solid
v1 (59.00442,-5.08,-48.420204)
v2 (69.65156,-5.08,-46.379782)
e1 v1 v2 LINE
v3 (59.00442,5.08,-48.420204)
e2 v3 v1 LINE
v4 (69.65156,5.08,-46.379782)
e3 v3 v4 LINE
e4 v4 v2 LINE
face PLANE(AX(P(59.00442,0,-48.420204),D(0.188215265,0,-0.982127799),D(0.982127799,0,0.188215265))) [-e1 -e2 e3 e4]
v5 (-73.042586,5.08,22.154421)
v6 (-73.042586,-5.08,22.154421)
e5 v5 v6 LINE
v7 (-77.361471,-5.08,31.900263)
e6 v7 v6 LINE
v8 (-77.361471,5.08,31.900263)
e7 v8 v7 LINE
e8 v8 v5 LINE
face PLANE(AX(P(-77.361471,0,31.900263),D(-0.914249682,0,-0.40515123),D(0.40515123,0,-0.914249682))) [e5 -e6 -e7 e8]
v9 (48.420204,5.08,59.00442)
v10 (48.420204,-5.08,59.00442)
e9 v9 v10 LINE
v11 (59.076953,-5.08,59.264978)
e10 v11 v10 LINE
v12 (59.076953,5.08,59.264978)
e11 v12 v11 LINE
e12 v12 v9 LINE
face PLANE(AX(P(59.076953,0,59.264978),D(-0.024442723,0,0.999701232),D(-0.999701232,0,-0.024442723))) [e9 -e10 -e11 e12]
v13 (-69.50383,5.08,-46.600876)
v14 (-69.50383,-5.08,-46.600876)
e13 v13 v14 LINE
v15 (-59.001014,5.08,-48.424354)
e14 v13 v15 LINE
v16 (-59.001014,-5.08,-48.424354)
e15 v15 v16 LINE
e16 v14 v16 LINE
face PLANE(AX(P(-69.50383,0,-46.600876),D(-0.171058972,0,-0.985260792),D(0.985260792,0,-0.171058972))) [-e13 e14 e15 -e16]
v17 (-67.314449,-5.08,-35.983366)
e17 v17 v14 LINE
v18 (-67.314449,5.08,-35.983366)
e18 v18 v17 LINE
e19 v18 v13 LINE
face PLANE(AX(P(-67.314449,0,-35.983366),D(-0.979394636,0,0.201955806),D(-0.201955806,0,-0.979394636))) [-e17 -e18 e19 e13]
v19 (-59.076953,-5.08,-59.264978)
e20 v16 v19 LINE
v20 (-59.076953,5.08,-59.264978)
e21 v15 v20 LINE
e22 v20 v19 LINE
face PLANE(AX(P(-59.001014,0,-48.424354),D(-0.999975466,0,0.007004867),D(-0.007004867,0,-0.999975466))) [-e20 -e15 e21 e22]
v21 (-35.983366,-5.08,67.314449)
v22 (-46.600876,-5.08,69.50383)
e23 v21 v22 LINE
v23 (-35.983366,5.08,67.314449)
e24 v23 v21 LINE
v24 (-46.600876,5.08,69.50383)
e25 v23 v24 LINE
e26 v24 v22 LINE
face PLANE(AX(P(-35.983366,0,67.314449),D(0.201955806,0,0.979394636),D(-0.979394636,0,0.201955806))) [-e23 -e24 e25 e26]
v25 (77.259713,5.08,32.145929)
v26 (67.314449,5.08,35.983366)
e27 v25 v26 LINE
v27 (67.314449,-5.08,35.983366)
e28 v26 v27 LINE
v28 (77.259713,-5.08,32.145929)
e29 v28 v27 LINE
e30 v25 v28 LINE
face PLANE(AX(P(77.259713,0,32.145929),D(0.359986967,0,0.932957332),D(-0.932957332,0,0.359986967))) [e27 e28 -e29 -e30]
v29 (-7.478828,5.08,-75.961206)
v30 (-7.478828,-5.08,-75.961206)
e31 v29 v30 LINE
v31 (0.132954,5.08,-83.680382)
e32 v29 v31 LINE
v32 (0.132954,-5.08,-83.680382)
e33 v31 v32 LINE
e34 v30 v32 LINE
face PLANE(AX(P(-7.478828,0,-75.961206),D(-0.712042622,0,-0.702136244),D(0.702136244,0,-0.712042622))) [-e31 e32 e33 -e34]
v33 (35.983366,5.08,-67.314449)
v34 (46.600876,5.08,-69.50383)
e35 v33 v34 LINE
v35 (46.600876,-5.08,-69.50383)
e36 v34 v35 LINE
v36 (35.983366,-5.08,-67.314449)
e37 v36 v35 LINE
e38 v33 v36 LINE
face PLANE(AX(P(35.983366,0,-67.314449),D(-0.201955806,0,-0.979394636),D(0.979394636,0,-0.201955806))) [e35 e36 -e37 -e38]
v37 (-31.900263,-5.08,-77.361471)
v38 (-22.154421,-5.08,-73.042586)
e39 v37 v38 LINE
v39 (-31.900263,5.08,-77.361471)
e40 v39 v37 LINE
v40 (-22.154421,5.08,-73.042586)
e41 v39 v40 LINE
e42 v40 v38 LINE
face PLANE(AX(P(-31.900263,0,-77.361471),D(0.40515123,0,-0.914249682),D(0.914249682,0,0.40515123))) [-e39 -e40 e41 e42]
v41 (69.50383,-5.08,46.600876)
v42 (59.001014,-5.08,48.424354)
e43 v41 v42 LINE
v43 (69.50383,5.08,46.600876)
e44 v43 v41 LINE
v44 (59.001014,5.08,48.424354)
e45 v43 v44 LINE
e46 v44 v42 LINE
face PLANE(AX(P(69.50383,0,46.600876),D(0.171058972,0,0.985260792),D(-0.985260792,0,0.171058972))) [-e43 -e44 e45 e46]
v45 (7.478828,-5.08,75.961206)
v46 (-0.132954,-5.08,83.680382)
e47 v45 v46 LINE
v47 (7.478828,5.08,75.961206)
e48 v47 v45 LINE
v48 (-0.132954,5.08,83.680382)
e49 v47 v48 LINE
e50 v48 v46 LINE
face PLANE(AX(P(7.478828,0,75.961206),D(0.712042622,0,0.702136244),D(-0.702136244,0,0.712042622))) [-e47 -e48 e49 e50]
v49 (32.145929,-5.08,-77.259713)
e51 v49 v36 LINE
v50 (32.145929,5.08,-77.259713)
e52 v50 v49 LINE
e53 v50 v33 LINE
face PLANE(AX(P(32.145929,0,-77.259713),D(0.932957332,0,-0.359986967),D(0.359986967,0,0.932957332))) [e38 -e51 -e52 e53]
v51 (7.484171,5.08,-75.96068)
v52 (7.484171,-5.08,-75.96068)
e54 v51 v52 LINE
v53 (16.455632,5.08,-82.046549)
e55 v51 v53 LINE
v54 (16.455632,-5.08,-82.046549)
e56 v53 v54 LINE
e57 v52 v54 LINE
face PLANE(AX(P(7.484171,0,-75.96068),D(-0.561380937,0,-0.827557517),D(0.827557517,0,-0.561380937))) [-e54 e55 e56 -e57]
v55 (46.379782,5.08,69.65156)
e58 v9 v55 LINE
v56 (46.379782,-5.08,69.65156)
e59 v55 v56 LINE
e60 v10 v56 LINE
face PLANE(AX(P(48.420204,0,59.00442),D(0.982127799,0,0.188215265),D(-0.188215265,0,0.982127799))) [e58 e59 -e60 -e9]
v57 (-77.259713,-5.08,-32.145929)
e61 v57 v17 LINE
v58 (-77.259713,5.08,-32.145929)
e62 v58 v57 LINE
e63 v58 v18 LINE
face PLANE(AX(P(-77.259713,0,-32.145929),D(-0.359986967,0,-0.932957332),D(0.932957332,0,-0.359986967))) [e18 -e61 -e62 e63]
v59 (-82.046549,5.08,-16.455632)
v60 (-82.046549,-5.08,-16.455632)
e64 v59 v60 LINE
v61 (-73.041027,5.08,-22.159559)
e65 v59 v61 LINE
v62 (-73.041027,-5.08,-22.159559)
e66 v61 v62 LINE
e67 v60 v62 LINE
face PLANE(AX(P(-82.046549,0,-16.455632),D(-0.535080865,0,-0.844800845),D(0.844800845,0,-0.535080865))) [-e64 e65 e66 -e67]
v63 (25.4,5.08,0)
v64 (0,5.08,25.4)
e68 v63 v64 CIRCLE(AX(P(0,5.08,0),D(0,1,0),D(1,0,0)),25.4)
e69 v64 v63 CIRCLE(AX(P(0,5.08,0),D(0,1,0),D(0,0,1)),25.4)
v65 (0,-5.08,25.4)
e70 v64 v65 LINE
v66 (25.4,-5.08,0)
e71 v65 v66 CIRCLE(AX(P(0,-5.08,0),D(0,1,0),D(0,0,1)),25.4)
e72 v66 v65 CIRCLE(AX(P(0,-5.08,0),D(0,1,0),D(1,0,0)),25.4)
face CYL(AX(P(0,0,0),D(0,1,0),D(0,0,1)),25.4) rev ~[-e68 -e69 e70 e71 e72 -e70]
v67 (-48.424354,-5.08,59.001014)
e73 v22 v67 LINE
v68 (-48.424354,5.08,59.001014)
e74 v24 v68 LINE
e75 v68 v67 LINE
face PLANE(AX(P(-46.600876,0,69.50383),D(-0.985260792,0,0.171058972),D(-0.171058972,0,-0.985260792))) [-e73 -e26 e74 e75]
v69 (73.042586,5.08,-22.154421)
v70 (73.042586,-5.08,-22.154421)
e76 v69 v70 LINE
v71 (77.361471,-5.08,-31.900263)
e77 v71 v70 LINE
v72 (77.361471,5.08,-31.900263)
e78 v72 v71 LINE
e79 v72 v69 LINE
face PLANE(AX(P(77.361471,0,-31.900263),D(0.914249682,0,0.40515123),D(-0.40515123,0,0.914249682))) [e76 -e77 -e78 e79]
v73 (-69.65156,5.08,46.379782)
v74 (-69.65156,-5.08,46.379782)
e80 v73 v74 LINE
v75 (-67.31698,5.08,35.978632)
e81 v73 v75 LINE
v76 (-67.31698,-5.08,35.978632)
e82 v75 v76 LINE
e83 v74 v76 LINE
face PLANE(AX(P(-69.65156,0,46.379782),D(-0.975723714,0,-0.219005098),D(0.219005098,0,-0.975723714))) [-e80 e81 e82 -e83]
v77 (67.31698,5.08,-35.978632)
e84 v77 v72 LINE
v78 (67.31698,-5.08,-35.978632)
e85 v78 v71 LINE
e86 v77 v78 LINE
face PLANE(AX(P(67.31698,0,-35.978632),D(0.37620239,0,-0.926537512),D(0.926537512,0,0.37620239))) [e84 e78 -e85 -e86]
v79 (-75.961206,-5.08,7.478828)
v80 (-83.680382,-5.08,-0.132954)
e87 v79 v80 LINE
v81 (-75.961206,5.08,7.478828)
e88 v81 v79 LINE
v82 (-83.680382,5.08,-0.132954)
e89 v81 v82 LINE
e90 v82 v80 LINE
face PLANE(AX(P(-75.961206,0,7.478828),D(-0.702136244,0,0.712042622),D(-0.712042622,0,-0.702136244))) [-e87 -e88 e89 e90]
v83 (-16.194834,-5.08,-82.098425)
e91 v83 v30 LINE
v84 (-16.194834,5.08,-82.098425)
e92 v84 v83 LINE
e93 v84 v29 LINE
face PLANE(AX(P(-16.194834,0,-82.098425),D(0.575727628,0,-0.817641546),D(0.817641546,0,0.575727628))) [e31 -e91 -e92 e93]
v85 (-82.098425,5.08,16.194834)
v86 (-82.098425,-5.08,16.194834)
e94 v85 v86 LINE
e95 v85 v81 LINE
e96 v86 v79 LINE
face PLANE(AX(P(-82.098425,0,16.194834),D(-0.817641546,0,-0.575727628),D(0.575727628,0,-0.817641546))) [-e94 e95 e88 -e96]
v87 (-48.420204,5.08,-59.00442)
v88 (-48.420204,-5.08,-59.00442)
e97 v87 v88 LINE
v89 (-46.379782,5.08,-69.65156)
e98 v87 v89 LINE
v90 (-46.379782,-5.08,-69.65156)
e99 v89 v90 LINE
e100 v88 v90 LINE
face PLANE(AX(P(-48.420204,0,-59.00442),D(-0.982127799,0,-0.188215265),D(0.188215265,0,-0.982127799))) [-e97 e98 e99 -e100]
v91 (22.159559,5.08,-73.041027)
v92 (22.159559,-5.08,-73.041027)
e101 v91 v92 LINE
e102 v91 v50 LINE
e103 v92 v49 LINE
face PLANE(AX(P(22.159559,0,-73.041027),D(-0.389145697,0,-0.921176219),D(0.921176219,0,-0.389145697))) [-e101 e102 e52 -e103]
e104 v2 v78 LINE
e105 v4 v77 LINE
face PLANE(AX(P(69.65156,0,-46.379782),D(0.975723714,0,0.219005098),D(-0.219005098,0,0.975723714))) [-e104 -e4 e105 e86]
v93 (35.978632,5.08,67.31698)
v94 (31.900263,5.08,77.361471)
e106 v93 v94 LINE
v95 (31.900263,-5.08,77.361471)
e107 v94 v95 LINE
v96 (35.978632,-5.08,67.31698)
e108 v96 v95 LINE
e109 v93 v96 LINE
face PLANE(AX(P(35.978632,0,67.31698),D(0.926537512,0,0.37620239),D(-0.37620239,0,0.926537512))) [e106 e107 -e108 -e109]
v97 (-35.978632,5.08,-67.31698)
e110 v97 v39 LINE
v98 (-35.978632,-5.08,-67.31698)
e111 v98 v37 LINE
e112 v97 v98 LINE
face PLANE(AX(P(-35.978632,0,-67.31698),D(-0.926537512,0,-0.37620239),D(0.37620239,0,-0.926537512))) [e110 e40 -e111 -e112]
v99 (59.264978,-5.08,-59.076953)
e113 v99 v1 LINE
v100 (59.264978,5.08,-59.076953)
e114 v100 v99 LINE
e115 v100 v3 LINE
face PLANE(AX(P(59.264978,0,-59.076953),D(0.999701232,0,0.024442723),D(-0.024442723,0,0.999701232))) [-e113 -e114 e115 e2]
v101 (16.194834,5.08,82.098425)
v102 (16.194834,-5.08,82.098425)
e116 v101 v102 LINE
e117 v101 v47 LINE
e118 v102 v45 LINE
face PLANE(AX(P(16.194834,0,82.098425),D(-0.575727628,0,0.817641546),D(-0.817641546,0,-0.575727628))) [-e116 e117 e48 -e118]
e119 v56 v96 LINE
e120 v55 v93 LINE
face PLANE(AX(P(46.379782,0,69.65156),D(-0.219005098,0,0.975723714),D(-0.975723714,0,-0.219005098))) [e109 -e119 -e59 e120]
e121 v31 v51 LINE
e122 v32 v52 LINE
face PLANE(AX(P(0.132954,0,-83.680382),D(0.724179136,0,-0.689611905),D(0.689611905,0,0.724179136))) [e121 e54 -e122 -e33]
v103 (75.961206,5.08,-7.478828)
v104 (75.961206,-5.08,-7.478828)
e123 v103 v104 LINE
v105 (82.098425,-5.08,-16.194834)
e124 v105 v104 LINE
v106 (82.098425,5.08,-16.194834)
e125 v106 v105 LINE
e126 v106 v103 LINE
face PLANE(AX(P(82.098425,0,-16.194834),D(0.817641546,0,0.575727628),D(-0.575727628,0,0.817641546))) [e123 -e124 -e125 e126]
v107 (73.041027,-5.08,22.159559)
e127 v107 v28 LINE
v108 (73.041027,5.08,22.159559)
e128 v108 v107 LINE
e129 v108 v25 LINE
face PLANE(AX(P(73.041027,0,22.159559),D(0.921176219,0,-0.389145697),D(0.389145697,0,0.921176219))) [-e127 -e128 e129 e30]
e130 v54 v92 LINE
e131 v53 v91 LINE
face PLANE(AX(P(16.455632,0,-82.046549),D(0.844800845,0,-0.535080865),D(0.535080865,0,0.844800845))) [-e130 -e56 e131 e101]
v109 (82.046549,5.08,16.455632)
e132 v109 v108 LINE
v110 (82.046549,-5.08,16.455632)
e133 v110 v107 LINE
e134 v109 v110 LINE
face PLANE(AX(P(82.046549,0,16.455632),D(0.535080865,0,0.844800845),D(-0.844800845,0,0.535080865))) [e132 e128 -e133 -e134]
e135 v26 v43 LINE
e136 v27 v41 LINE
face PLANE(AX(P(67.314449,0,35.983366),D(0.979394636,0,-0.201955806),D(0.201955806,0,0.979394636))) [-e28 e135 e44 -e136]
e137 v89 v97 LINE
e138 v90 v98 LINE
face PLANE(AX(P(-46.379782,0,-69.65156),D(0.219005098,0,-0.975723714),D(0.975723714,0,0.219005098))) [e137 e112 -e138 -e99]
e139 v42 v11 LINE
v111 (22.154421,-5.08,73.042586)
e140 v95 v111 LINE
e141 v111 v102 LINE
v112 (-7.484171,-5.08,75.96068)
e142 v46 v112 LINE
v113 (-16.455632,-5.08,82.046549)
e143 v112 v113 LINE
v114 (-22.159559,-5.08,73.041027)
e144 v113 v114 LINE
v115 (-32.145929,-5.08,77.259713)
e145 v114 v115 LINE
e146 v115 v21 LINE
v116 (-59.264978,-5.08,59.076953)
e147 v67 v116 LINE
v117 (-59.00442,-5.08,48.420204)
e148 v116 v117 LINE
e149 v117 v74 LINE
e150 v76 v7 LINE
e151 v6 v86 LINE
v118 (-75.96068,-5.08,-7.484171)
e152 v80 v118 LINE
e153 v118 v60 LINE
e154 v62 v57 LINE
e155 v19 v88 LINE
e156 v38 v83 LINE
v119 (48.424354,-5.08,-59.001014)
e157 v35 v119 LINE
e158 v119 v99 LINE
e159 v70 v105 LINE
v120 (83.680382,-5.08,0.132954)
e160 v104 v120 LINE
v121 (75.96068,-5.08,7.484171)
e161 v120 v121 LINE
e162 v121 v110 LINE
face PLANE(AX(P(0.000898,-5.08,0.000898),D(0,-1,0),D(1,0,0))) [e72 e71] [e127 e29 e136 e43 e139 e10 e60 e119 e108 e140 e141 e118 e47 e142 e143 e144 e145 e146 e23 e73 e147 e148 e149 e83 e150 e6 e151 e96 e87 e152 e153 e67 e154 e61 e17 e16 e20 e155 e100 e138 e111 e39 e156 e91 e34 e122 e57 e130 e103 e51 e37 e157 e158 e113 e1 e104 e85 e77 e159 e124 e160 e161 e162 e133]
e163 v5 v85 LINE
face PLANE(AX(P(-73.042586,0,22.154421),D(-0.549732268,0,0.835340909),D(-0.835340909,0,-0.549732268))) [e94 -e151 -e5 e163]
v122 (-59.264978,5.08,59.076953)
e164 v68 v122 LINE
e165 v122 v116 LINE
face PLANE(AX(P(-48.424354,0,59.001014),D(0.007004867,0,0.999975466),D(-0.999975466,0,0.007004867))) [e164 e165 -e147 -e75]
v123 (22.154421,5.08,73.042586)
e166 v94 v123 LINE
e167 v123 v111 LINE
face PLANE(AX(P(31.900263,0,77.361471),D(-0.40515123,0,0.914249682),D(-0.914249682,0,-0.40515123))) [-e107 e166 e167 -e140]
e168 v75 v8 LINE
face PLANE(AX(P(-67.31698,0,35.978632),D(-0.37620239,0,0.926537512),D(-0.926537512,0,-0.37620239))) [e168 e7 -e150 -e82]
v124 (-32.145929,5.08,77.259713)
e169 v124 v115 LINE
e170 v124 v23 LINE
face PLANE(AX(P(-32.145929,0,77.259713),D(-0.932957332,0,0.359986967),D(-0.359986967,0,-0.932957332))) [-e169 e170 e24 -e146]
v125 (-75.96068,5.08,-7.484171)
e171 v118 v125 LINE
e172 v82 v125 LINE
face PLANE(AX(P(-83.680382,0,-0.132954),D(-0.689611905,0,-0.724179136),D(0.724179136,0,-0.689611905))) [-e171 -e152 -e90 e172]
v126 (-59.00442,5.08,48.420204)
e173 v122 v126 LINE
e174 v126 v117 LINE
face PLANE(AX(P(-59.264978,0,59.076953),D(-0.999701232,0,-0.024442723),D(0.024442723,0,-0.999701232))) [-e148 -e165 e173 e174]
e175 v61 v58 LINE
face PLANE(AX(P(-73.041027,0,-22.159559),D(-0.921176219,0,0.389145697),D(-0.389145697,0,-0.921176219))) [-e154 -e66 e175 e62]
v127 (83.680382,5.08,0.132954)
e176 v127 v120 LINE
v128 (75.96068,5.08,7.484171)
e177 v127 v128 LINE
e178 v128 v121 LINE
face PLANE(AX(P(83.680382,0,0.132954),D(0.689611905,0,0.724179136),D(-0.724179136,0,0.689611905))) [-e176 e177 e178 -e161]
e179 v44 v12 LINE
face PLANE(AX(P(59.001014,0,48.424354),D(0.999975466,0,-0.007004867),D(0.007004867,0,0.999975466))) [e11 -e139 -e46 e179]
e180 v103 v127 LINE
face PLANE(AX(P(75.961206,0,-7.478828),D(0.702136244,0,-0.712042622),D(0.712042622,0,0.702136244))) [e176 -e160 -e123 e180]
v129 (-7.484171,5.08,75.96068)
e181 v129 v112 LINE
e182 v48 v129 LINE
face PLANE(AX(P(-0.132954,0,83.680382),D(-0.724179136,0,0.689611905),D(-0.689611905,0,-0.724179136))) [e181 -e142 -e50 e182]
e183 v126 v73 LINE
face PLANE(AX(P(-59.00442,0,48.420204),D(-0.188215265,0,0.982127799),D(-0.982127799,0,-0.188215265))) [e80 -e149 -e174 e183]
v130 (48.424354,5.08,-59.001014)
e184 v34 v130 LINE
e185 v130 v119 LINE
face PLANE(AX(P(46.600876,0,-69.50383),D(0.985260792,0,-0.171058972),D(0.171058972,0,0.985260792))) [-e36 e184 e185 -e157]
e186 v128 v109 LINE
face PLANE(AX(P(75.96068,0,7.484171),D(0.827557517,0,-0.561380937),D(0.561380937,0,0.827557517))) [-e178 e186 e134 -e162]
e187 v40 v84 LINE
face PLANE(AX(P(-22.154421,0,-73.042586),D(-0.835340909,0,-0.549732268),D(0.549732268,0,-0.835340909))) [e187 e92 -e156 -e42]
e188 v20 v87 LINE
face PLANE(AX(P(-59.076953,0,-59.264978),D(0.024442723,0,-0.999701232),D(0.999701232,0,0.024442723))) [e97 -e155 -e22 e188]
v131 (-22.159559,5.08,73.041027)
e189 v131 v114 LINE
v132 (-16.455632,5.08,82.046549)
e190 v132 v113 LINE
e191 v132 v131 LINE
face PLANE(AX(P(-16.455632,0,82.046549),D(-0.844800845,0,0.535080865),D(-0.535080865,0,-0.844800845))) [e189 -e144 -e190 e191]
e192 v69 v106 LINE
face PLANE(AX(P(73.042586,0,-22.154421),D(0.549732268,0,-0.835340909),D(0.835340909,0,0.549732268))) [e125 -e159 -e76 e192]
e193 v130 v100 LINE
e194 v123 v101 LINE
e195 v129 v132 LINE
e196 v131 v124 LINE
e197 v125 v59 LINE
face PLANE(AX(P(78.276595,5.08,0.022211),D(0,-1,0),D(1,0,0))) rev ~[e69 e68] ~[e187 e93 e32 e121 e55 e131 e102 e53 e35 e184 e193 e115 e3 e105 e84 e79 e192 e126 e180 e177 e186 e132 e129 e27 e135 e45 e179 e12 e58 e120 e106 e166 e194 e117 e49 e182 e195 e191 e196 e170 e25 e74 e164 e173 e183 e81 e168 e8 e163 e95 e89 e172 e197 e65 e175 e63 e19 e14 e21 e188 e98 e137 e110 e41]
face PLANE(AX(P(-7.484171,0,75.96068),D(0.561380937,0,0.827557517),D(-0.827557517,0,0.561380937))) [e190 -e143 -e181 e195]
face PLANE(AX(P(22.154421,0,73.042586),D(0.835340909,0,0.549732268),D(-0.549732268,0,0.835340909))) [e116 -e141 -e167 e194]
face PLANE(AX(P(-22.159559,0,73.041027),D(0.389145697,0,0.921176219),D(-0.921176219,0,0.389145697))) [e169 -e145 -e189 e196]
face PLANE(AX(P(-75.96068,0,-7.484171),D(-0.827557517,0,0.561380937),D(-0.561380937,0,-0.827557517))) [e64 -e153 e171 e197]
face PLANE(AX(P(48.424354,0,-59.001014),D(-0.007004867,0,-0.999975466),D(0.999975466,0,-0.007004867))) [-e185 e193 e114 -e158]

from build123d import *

# Parameters (mm, degrees)
F1_DEPTH = 5.08
F2_DEPTH = 5.08
F3_DEPTH = 5.08


with BuildPart() as f1:
    # F0 (on Front) → F1 (new body, symmetric)
    with BuildSketch(Plane.XZ):
        with BuildLine():
            ThreePointArc((75.8478085303, 7.3177825298), (76.1119012048, 3.6631263964), (76.2, 0))
            ThreePointArc((76.2, 0), (76.1119012048, -3.6631263964), (75.8478085303, -7.3177825298))
            Line((75.8478085303, -7.3177825298), (75.9612060886, -7.4788283967))
            Line((75.9612060886, -7.4788283967), (83.6803820326, 0.1329535853))
            Line((83.6803820326, 0.1329535853), (75.9606798536, 7.4841713504))
            Line((75.9606798536, 7.4841713504), (75.8478085303, 7.3177825298))
        make_face()
        with BuildLine():
            ThreePointArc((75.8180427075, 7.62), (75.8330761724, 7.4689060931), (75.8478085303, 7.3177825298))
            Line((75.8478085303, 7.3177825298), (75.9606798536, 7.4841713504))
            Line((75.9606798536, 7.4841713504), (75.8180427075, 7.62))
        make_face()
        with BuildLine():
            Line((75.9612060886, -7.4788283967), (75.8478085303, -7.3177825298))
            ThreePointArc((75.8478085303, -7.3177825298), (75.8330761724, -7.4689060931), (75.8180427075, -7.62))
            Line((75.8180427075, -7.62), (75.9612060886, -7.4788283967))
        make_face()
        with BuildLine():
            ThreePointArc((72.9627856072, 21.9743467808), (74.7358383667, 14.8658825376), (75.8180427075, 7.62))
            Line((75.8180427075, 7.62), (75.9606798536, 7.4841713504))
            Line((75.9606798536, 7.4841713504), (82.0465489983, 16.4556315966))
            Line((82.0465489983, 16.4556315966), (73.041027291, 22.1595585897))
            Line((73.041027291, 22.1595585897), (72.9627856072, 21.9743467808))
        make_face()
        with BuildLine():
            Line((75.9612060886, -7.4788283967), (75.8180427075, -7.62))
            ThreePointArc((75.8180427075, -7.62), (74.7358383667, -14.8658825376), (72.9627856072, -21.9743467808))
            Line((72.9627856072, -21.9743467808), (73.0425857732, -22.1544209627))
            Line((73.0425857732, -22.1544209627), (82.0984249139, -16.1948337577))
            Line((82.0984249139, -16.1948337577), (75.9612060886, -7.4788283967))
        make_face()
        with BuildLine():
            ThreePointArc((72.8746320228, 22.2649502031), (72.9188535828, 22.1196924068), (72.9627856072, 21.9743467808))
            Line((72.9627856072, 21.9743467808), (73.041027291, 22.1595585897))
            Line((73.041027291, 22.1595585897), (72.8746320228, 22.2649502031))
        make_face()
        with BuildLine():
            Line((73.0425857732, -22.1544209627), (72.9627856072, -21.9743467808))
            ThreePointArc((72.9627856072, -21.9743467808), (72.9188535828, -22.1196924068), (72.8746320228, -22.2649502031))
            Line((72.8746320228, -22.2649502031), (73.0425857732, -22.1544209627))
        make_face()
        with BuildLine():
            ThreePointArc((67.2738437512, 35.7864492084), (70.3996203774, 29.1604775462), (72.8746320228, 22.2649502031))
            Line((72.8746320228, 22.2649502031), (73.041027291, 22.1595585897))
            Line((73.041027291, 22.1595585897), (77.2597130983, 32.1459289141))
            Line((77.2597130983, 32.1459289141), (67.3144490116, 35.9833664196))
            Line((67.3144490116, 35.9833664196), (67.2738437512, 35.7864492084))
        make_face()
        with BuildLine():
            Line((73.0425857732, -22.1544209627), (72.8746320228, -22.2649502031))
            ThreePointArc((72.8746320228, -22.2649502031), (70.3996203774, -29.1604775462), (67.2738437512, -35.7864492084))
            Line((67.2738437512, -35.7864492084), (67.3169798492, -35.9786315554))
            Line((67.3169798492, -35.9786315554), (77.361471367, -31.9002627216))
            Line((77.361471367, -31.9002627216), (73.0425857732, -22.1544209627))
        make_face()
        with BuildLine():
            ThreePointArc((67.1306900979, 36.0542708563), (67.2024003433, 35.9204313461), (67.2738437512, 35.7864492084))
            Line((67.2738437512, 35.7864492084), (67.3144490116, 35.9833664196))
            Line((67.3144490116, 35.9833664196), (67.1306900979, 36.0542708563))
        make_face()
        with BuildLine():
            Line((67.3169798492, -35.9786315554), (67.2738437512, -35.7864492084))
            ThreePointArc((67.2738437512, -35.7864492084), (67.2024003433, -35.9204313461), (67.1306900979, -36.0542708563))
            Line((67.1306900979, -36.0542708563), (67.3169798492, -35.9786315554))
        make_face()
        with BuildLine():
            ThreePointArc((58.9996058074, 48.2232984621), (63.3579844575, 42.3344517561), (67.1306900979, 36.0542708563))
            Line((67.1306900979, 36.0542708563), (67.3144490116, 35.9833664196))
            Line((67.3144490116, 35.9833664196), (69.5038297516, 46.6008762111))
            Line((69.5038297516, 46.6008762111), (59.001014207, 48.4243536577))
            Line((59.001014207, 48.4243536577), (58.9996058074, 48.2232984621))
        make_face()
        with BuildLine():
            Line((67.3169798492, -35.9786315554), (67.1306900979, -36.0542708563))
            ThreePointArc((67.1306900979, -36.0542708563), (63.3579844575, -42.3344517561), (58.9996058074, -48.2232984621))
            Line((58.9996058074, -48.2232984621), (59.0044201415, -48.4202035145))
            Line((59.0044201415, -48.4202035145), (69.6515598604, -46.379782479))
            Line((69.6515598604, -46.379782479), (67.3169798492, -35.9786315554))
        make_face()
        with BuildLine():
            ThreePointArc((58.8069534, 48.4580460999), (58.9033965462, 48.3407682533), (58.9996058074, 48.2232984621))
            Line((58.9996058074, 48.2232984621), (59.001014207, 48.4243536577))
            Line((59.001014207, 48.4243536577), (58.8069534, 48.4580460999))
        make_face()
        with BuildLine():
            Line((59.0044201415, -48.4202035145), (58.9996058074, -48.2232984621))
            ThreePointArc((58.9996058074, -48.2232984621), (58.9033965462, -48.3407682533), (58.8069534, -48.4580460999))
            Line((58.8069534, -48.4580460999), (59.0044201415, -48.4202035145))
        make_face()
        with BuildLine():
            ThreePointArc((48.4580460999, 58.8069534), (53.8815367264, 53.8815367264), (58.8069534, 48.4580460999))
            Line((58.8069534, 48.4580460999), (59.001014207, 48.4243536577))
            Line((59.001014207, 48.4243536577), (59.0769532058, 59.2649779693))
            Line((59.0769532058, 59.2649779693), (48.4202035145, 59.0044201415))
            Line((48.4202035145, 59.0044201415), (48.4580460999, 58.8069534))
        make_face()
        with BuildLine():
            Line((59.0044201415, -48.4202035145), (58.8069534, -48.4580460999))
            ThreePointArc((58.8069534, -48.4580460999), (53.8815367264, -53.8815367264), (48.4580460999, -58.8069534))
            Line((48.4580460999, -58.8069534), (48.4243536577, -59.001014207))
            Line((48.4243536577, -59.001014207), (59.2649779693, -59.0769532058))
            Line((59.2649779693, -59.0769532058), (59.0044201415, -48.4202035145))
        make_face()
        with BuildLine():
            ThreePointArc((48.2232984621, 58.9996058074), (48.3407682533, 58.9033965462), (48.4580460999, 58.8069534))
            Line((48.4580460999, 58.8069534), (48.4202035145, 59.0044201415))
            Line((48.4202035145, 59.0044201415), (48.2232984621, 58.9996058074))
        make_face()
        with BuildLine():
            Line((48.4243536577, -59.001014207), (48.4580460999, -58.8069534))
            ThreePointArc((48.4580460999, -58.8069534), (48.3407682533, -58.9033965462), (48.2232984621, -58.9996058074))
            Line((48.2232984621, -58.9996058074), (48.4243536577, -59.001014207))
        make_face()
        with BuildLine():
            ThreePointArc((36.0542708563, 67.1306900979), (42.3344517561, 63.3579844575), (48.2232984621, 58.9996058074))
            Line((48.2232984621, 58.9996058074), (48.4202035145, 59.0044201415))
            Line((48.4202035145, 59.0044201415), (46.379782479, 69.6515598604))
            Line((46.379782479, 69.6515598604), (35.9786315554, 67.3169798492))
            Line((35.9786315554, 67.3169798492), (36.0542708563, 67.1306900979))
        make_face()
        with BuildLine():
            Line((48.4243536577, -59.001014207), (48.2232984621, -58.9996058074))
            ThreePointArc((48.2232984621, -58.9996058074), (42.3344517561, -63.3579844575), (36.0542708563, -67.1306900979))
            Line((36.0542708563, -67.1306900979), (35.9833664196, -67.3144490116))
            Line((35.9833664196, -67.3144490116), (46.6008762111, -69.5038297516))
            Line((46.6008762111, -69.5038297516), (48.4243536577, -59.001014207))
        make_face()
        with BuildLine():
            ThreePointArc((35.7864492084, 67.2738437512), (35.9204313461, 67.2024003433), (36.0542708563, 67.1306900979))
            Line((36.0542708563, 67.1306900979), (35.9786315554, 67.3169798492))
            Line((35.9786315554, 67.3169798492), (35.7864492084, 67.2738437512))
        make_face()
        with BuildLine():
            Line((35.9833664196, -67.3144490116), (36.0542708563, -67.1306900979))
            ThreePointArc((36.0542708563, -67.1306900979), (35.9204313461, -67.2024003433), (35.7864492084, -67.2738437512))
            Line((35.7864492084, -67.2738437512), (35.9833664196, -67.3144490116))
        make_face()
        with BuildLine():
            ThreePointArc((22.2649502031, 72.8746320228), (29.1604775462, 70.3996203774), (35.7864492084, 67.2738437512))
            Line((35.7864492084, 67.2738437512), (35.9786315554, 67.3169798492))
            Line((35.9786315554, 67.3169798492), (31.9002627216, 77.361471367))
            Line((31.9002627216, 77.361471367), (22.1544209627, 73.0425857732))
            Line((22.1544209627, 73.0425857732), (22.2649502031, 72.8746320228))
        make_face()
        with BuildLine():
            Line((35.9833664196, -67.3144490116), (35.7864492084, -67.2738437512))
            ThreePointArc((35.7864492084, -67.2738437512), (29.1604775462, -70.3996203774), (22.2649502031, -72.8746320228))
            Line((22.2649502031, -72.8746320228), (22.1595585897, -73.041027291))
            Line((22.1595585897, -73.041027291), (32.1459289141, -77.2597130983))
            Line((32.1459289141, -77.2597130983), (35.9833664196, -67.3144490116))
        make_face()
        with BuildLine():
            ThreePointArc((21.9743467808, 72.9627856072), (22.1196924068, 72.9188535828), (22.2649502031, 72.8746320228))
            Line((22.2649502031, 72.8746320228), (22.1544209627, 73.0425857732))
            Line((22.1544209627, 73.0425857732), (21.9743467808, 72.9627856072))
        make_face()
        with BuildLine():
            Line((22.1595585897, -73.041027291), (22.2649502031, -72.8746320228))
            ThreePointArc((22.2649502031, -72.8746320228), (22.1196924068, -72.9188535828), (21.9743467808, -72.9627856072))
            Line((21.9743467808, -72.9627856072), (22.1595585897, -73.041027291))
        make_face()
        with BuildLine():
            ThreePointArc((7.62, 75.8180427075), (14.8658825376, 74.7358383667), (21.9743467808, 72.9627856072))
            Line((21.9743467808, 72.9627856072), (22.1544209627, 73.0425857732))
            Line((22.1544209627, 73.0425857732), (16.1948337577, 82.0984249139))
            Line((16.1948337577, 82.0984249139), (7.4788283967, 75.9612060886))
            Line((7.4788283967, 75.9612060886), (7.62, 75.8180427075))
        make_face()
        with BuildLine():
            Line((22.1595585897, -73.041027291), (21.9743467808, -72.9627856072))
            ThreePointArc((21.9743467808, -72.9627856072), (14.8658825376, -74.7358383667), (7.62, -75.8180427075))
            Line((7.62, -75.8180427075), (7.4841713504, -75.9606798536))
            Line((7.4841713504, -75.9606798536), (16.4556315966, -82.0465489983))
            Line((16.4556315966, -82.0465489983), (22.1595585897, -73.041027291))
        make_face()
        with BuildLine():
            ThreePointArc((7.3177825298, 75.8478085303), (7.4689060931, 75.8330761724), (7.62, 75.8180427075))
            Line((7.62, 75.8180427075), (7.4788283967, 75.9612060886))
            Line((7.4788283967, 75.9612060886), (7.3177825298, 75.8478085303))
        make_face()
        with BuildLine():
            Line((7.4841713504, -75.9606798536), (7.62, -75.8180427075))
            ThreePointArc((7.62, -75.8180427075), (7.4689060931, -75.8330761724), (7.3177825298, -75.8478085303))
            Line((7.3177825298, -75.8478085303), (7.4841713504, -75.9606798536))
        make_face()
        with BuildLine():
            ThreePointArc((0, 76.2), (3.6631263964, 76.1119012048), (7.3177825298, 75.8478085303))
            Line((7.3177825298, 75.8478085303), (7.4788283967, 75.9612060886))
            Line((7.4788283967, 75.9612060886), (-0.1329535853, 83.6803820326))
            Line((-0.1329535853, 83.6803820326), (-7.4841713504, 75.9606798536))
            Line((-7.4841713504, 75.9606798536), (-7.3177825298, 75.8478085303))
            ThreePointArc((-7.3177825298, 75.8478085303), (-3.6631263964, 76.1119012048), (0, 76.2))
        make_face()
        with BuildLine():
            Line((7.4841713504, -75.9606798536), (7.3177825298, -75.8478085303))
            ThreePointArc((7.3177825298, -75.8478085303), (0, -76.2), (-7.3177825298, -75.8478085303))
            Line((-7.3177825298, -75.8478085303), (-7.4788283967, -75.9612060886))
            Line((-7.4788283967, -75.9612060886), (0.1329535853, -83.6803820326))
            Line((0.1329535853, -83.6803820326), (7.4841713504, -75.9606798536))
        make_face()
        with BuildLine():
            Line((-7.4788283967, -75.9612060886), (-7.3177825298, -75.8478085303))
            ThreePointArc((-7.3177825298, -75.8478085303), (-7.4689060931, -75.8330761724), (-7.62, -75.8180427075))
            Line((-7.62, -75.8180427075), (-7.4788283967, -75.9612060886))
        make_face()
        with BuildLine():
            ThreePointArc((-7.62, 75.8180427075), (-7.4689060931, 75.8330761724), (-7.3177825298, 75.8478085303))
            Line((-7.3177825298, 75.8478085303), (-7.4841713504, 75.9606798536))
            Line((-7.4841713504, 75.9606798536), (-7.62, 75.8180427075))
        make_face()
        with BuildLine():
            Line((-7.62, 75.8180427075), (-7.4841713504, 75.9606798536))
            Line((-7.4841713504, 75.9606798536), (-16.4556315966, 82.0465489983))
            Line((-16.4556315966, 82.0465489983), (-22.1595585897, 73.041027291))
            Line((-22.1595585897, 73.041027291), (-21.9743467808, 72.9627856072))
            ThreePointArc((-21.9743467808, 72.9627856072), (-14.8658825376, 74.7358383667), (-7.62, 75.8180427075))
        make_face()
        with BuildLine():
            Line((-7.4788283967, -75.9612060886), (-7.62, -75.8180427075))
            ThreePointArc((-7.62, -75.8180427075), (-14.8658825376, -74.7358383667), (-21.9743467808, -72.9627856072))
            Line((-21.9743467808, -72.9627856072), (-22.1544209627, -73.0425857732))
            Line((-22.1544209627, -73.0425857732), (-16.1948337577, -82.0984249139))
            Line((-16.1948337577, -82.0984249139), (-7.4788283967, -75.9612060886))
        make_face()
        with BuildLine():
            Line((-22.1544209627, -73.0425857732), (-21.9743467808, -72.9627856072))
            ThreePointArc((-21.9743467808, -72.9627856072), (-22.1196924068, -72.9188535828), (-22.2649502031, -72.8746320228))
            Line((-22.2649502031, -72.8746320228), (-22.1544209627, -73.0425857732))
        make_face()
        with BuildLine():
            ThreePointArc((-22.2649502031, 72.8746320228), (-22.1196924068, 72.9188535828), (-21.9743467808, 72.9627856072))
            Line((-21.9743467808, 72.9627856072), (-22.1595585897, 73.041027291))
            Line((-22.1595585897, 73.041027291), (-22.2649502031, 72.8746320228))
        make_face()
        with BuildLine():
            Line((-22.2649502031, 72.8746320228), (-22.1595585897, 73.041027291))
            Line((-22.1595585897, 73.041027291), (-32.1459289141, 77.2597130983))
            Line((-32.1459289141, 77.2597130983), (-35.9833664196, 67.3144490116))
            Line((-35.9833664196, 67.3144490116), (-35.7864492084, 67.2738437512))
            ThreePointArc((-35.7864492084, 67.2738437512), (-29.1604775462, 70.3996203774), (-22.2649502031, 72.8746320228))
        make_face()
        with BuildLine():
            Line((-22.1544209627, -73.0425857732), (-22.2649502031, -72.8746320228))
            ThreePointArc((-22.2649502031, -72.8746320228), (-29.1604775462, -70.3996203774), (-35.7864492084, -67.2738437512))
            Line((-35.7864492084, -67.2738437512), (-35.9786315554, -67.3169798492))
            Line((-35.9786315554, -67.3169798492), (-31.9002627216, -77.361471367))
            Line((-31.9002627216, -77.361471367), (-22.1544209627, -73.0425857732))
        make_face()
        with BuildLine():
            Line((-35.9786315554, -67.3169798492), (-35.7864492084, -67.2738437512))
            ThreePointArc((-35.7864492084, -67.2738437512), (-35.9204313461, -67.2024003433), (-36.0542708563, -67.1306900979))
            Line((-36.0542708563, -67.1306900979), (-35.9786315554, -67.3169798492))
        make_face()
        with BuildLine():
            ThreePointArc((-36.0542708563, 67.1306900979), (-35.9204313461, 67.2024003433), (-35.7864492084, 67.2738437512))
            Line((-35.7864492084, 67.2738437512), (-35.9833664196, 67.3144490116))
            Line((-35.9833664196, 67.3144490116), (-36.0542708563, 67.1306900979))
        make_face()
        with BuildLine():
            Line((-36.0542708563, 67.1306900979), (-35.9833664196, 67.3144490116))
            Line((-35.9833664196, 67.3144490116), (-46.6008762111, 69.5038297516))
            Line((-46.6008762111, 69.5038297516), (-48.4243536577, 59.001014207))
            Line((-48.4243536577, 59.001014207), (-48.2232984621, 58.9996058074))
            ThreePointArc((-48.2232984621, 58.9996058074), (-42.3344517561, 63.3579844575), (-36.0542708563, 67.1306900979))
        make_face()
        with BuildLine():
            Line((-35.9786315554, -67.3169798492), (-36.0542708563, -67.1306900979))
            ThreePointArc((-36.0542708563, -67.1306900979), (-42.3344517561, -63.3579844575), (-48.2232984621, -58.9996058074))
            Line((-48.2232984621, -58.9996058074), (-48.4202035145, -59.0044201415))
            Line((-48.4202035145, -59.0044201415), (-46.379782479, -69.6515598604))
            Line((-46.379782479, -69.6515598604), (-35.9786315554, -67.3169798492))
        make_face()
        with BuildLine():
            Line((-48.4202035145, -59.0044201415), (-48.2232984621, -58.9996058074))
            ThreePointArc((-48.2232984621, -58.9996058074), (-48.3407682533, -58.9033965462), (-48.4580460999, -58.8069534))
            Line((-48.4580460999, -58.8069534), (-48.4202035145, -59.0044201415))
        make_face()
        with BuildLine():
            ThreePointArc((-48.4580460999, 58.8069534), (-48.3407682533, 58.9033965462), (-48.2232984621, 58.9996058074))
            Line((-48.2232984621, 58.9996058074), (-48.4243536577, 59.001014207))
            Line((-48.4243536577, 59.001014207), (-48.4580460999, 58.8069534))
        make_face()
        with BuildLine():
            Line((-48.4580460999, 58.8069534), (-48.4243536577, 59.001014207))
            Line((-48.4243536577, 59.001014207), (-59.2649779693, 59.0769532058))
            Line((-59.2649779693, 59.0769532058), (-59.0044201415, 48.4202035145))
            Line((-59.0044201415, 48.4202035145), (-58.8069534, 48.4580460999))
            ThreePointArc((-58.8069534, 48.4580460999), (-53.8815367264, 53.8815367264), (-48.4580460999, 58.8069534))
        make_face()
        with BuildLine():
            Line((-48.4202035145, -59.0044201415), (-48.4580460999, -58.8069534))
            ThreePointArc((-48.4580460999, -58.8069534), (-53.8815367264, -53.8815367264), (-58.8069534, -48.4580460999))
            Line((-58.8069534, -48.4580460999), (-59.001014207, -48.4243536577))
            Line((-59.001014207, -48.4243536577), (-59.0769532058, -59.2649779693))
            Line((-59.0769532058, -59.2649779693), (-48.4202035145, -59.0044201415))
        make_face()
        with BuildLine():
            Line((-59.001014207, -48.4243536577), (-58.8069534, -48.4580460999))
            ThreePointArc((-58.8069534, -48.4580460999), (-58.9033965462, -48.3407682533), (-58.9996058074, -48.2232984621))
            Line((-58.9996058074, -48.2232984621), (-59.001014207, -48.4243536577))
        make_face()
        with BuildLine():
            ThreePointArc((-58.9996058074, 48.2232984621), (-58.9033965462, 48.3407682533), (-58.8069534, 48.4580460999))
            Line((-58.8069534, 48.4580460999), (-59.0044201415, 48.4202035145))
            Line((-59.0044201415, 48.4202035145), (-58.9996058074, 48.2232984621))
        make_face()
        with BuildLine():
            Line((-58.9996058074, 48.2232984621), (-59.0044201415, 48.4202035145))
            Line((-59.0044201415, 48.4202035145), (-69.6515598604, 46.379782479))
            Line((-69.6515598604, 46.379782479), (-67.3169798492, 35.9786315554))
            Line((-67.3169798492, 35.9786315554), (-67.1306900979, 36.0542708563))
            ThreePointArc((-67.1306900979, 36.0542708563), (-63.3579844575, 42.3344517561), (-58.9996058074, 48.2232984621))
        make_face()
        with BuildLine():
            Line((-59.001014207, -48.4243536577), (-58.9996058074, -48.2232984621))
            ThreePointArc((-58.9996058074, -48.2232984621), (-63.3579844575, -42.3344517561), (-67.1306900979, -36.0542708563))
            Line((-67.1306900979, -36.0542708563), (-67.3144490116, -35.9833664196))
            Line((-67.3144490116, -35.9833664196), (-69.5038297516, -46.6008762111))
            Line((-69.5038297516, -46.6008762111), (-59.001014207, -48.4243536577))
        make_face()
        with BuildLine():
            Line((-67.3144490116, -35.9833664196), (-67.1306900979, -36.0542708563))
            ThreePointArc((-67.1306900979, -36.0542708563), (-67.2024003433, -35.9204313461), (-67.2738437512, -35.7864492084))
            Line((-67.2738437512, -35.7864492084), (-67.3144490116, -35.9833664196))
        make_face()
        with BuildLine():
            ThreePointArc((-67.2738437512, 35.7864492084), (-67.2024003433, 35.9204313461), (-67.1306900979, 36.0542708563))
            Line((-67.1306900979, 36.0542708563), (-67.3169798492, 35.9786315554))
            Line((-67.3169798492, 35.9786315554), (-67.2738437512, 35.7864492084))
        make_face()
        with BuildLine():
            Line((-67.2738437512, 35.7864492084), (-67.3169798492, 35.9786315554))
            Line((-67.3169798492, 35.9786315554), (-77.361471367, 31.9002627216))
            Line((-77.361471367, 31.9002627216), (-73.0425857732, 22.1544209627))
            Line((-73.0425857732, 22.1544209627), (-72.8746320228, 22.2649502031))
            ThreePointArc((-72.8746320228, 22.2649502031), (-70.3996203774, 29.1604775462), (-67.2738437512, 35.7864492084))
        make_face()
        with BuildLine():
            Line((-67.3144490116, -35.9833664196), (-67.2738437512, -35.7864492084))
            ThreePointArc((-67.2738437512, -35.7864492084), (-70.3996203774, -29.1604775462), (-72.8746320228, -22.2649502031))
            Line((-72.8746320228, -22.2649502031), (-73.041027291, -22.1595585897))
            Line((-73.041027291, -22.1595585897), (-77.2597130983, -32.1459289141))
            Line((-77.2597130983, -32.1459289141), (-67.3144490116, -35.9833664196))
        make_face()
        with BuildLine():
            Line((-73.041027291, -22.1595585897), (-72.8746320228, -22.2649502031))
            ThreePointArc((-72.8746320228, -22.2649502031), (-72.9188535828, -22.1196924068), (-72.9627856072, -21.9743467808))
            Line((-72.9627856072, -21.9743467808), (-73.041027291, -22.1595585897))
        make_face()
        with BuildLine():
            ThreePointArc((-72.9627856072, 21.9743467808), (-72.9188535828, 22.1196924068), (-72.8746320228, 22.2649502031))
            Line((-72.8746320228, 22.2649502031), (-73.0425857732, 22.1544209627))
            Line((-73.0425857732, 22.1544209627), (-72.9627856072, 21.9743467808))
        make_face()
        with BuildLine():
            Line((-72.9627856072, 21.9743467808), (-73.0425857732, 22.1544209627))
            Line((-73.0425857732, 22.1544209627), (-82.0984249139, 16.1948337577))
            Line((-82.0984249139, 16.1948337577), (-75.9612060886, 7.4788283967))
            Line((-75.9612060886, 7.4788283967), (-75.8180427075, 7.62))
            ThreePointArc((-75.8180427075, 7.62), (-74.7358383667, 14.8658825376), (-72.9627856072, 21.9743467808))
        make_face()
        with BuildLine():
            Line((-73.041027291, -22.1595585897), (-72.9627856072, -21.9743467808))
            ThreePointArc((-72.9627856072, -21.9743467808), (-74.7358383667, -14.8658825376), (-75.8180427075, -7.62))
            Line((-75.8180427075, -7.62), (-75.9606798536, -7.4841713504))
            Line((-75.9606798536, -7.4841713504), (-82.0465489983, -16.4556315966))
            Line((-82.0465489983, -16.4556315966), (-73.041027291, -22.1595585897))
        make_face()
        with BuildLine():
            Line((-75.9606798536, -7.4841713504), (-75.8180427075, -7.62))
            ThreePointArc((-75.8180427075, -7.62), (-75.8330761724, -7.4689060931), (-75.8478085303, -7.3177825298))
            Line((-75.8478085303, -7.3177825298), (-75.9606798536, -7.4841713504))
        make_face()
        with BuildLine():
            ThreePointArc((-75.8478085303, 7.3177825298), (-75.8330761724, 7.4689060931), (-75.8180427075, 7.62))
            Line((-75.8180427075, 7.62), (-75.9612060886, 7.4788283967))
            Line((-75.9612060886, 7.4788283967), (-75.8478085303, 7.3177825298))
        make_face()
        with BuildLine():
            Line((-75.8478085303, 7.3177825298), (-75.9612060886, 7.4788283967))
            Line((-75.9612060886, 7.4788283967), (-83.6803820326, -0.1329535853))
            Line((-83.6803820326, -0.1329535853), (-75.9606798536, -7.4841713504))
            Line((-75.9606798536, -7.4841713504), (-75.8478085303, -7.3177825298))
            ThreePointArc((-75.8478085303, -7.3177825298), (-76.2, 0), (-75.8478085303, 7.3177825298))
        make_face()
    extrude(amount=F1_DEPTH, both=True)

    # F0 (on Front) → F2 (join, symmetric)
    with BuildSketch(Plane.XZ):
        with BuildLine():
            ThreePointArc((75.8478085303, -7.3177825298), (76.1119012048, -3.6631263964), (76.2, 0))
            ThreePointArc((76.2, 0), (76.1119012048, 3.6631263964), (75.8478085303, 7.3177825298))
            ThreePointArc((75.8478085303, 7.3177825298), (75.8330761724, 7.4689060931), (75.8180427075, 7.62))
            ThreePointArc((75.8180427075, 7.62), (74.7358383667, 14.8658825376), (72.9627856072, 21.9743467808))
            ThreePointArc((72.9627856072, 21.9743467808), (72.9188535828, 22.1196924068), (72.8746320228, 22.2649502031))
            ThreePointArc((72.8746320228, 22.2649502031), (70.3996203774, 29.1604775462), (67.2738437512, 35.7864492084))
            ThreePointArc((67.2738437512, 35.7864492084), (67.2024003433, 35.9204313461), (67.1306900979, 36.0542708563))
            ThreePointArc((67.1306900979, 36.0542708563), (63.3579844575, 42.3344517561), (58.9996058074, 48.2232984621))
            ThreePointArc((58.9996058074, 48.2232984621), (58.9033965462, 48.3407682533), (58.8069534, 48.4580460999))
            ThreePointArc((58.8069534, 48.4580460999), (53.8815367264, 53.8815367264), (48.4580460999, 58.8069534))
            ThreePointArc((48.4580460999, 58.8069534), (48.3407682533, 58.9033965462), (48.2232984621, 58.9996058074))
            ThreePointArc((48.2232984621, 58.9996058074), (42.3344517561, 63.3579844575), (36.0542708563, 67.1306900979))
            ThreePointArc((36.0542708563, 67.1306900979), (35.9204313461, 67.2024003433), (35.7864492084, 67.2738437512))
            ThreePointArc((35.7864492084, 67.2738437512), (29.1604775462, 70.3996203774), (22.2649502031, 72.8746320228))
            ThreePointArc((22.2649502031, 72.8746320228), (22.1196924068, 72.9188535828), (21.9743467808, 72.9627856072))
            ThreePointArc((21.9743467808, 72.9627856072), (14.8658825376, 74.7358383667), (7.62, 75.8180427075))
            ThreePointArc((7.62, 75.8180427075), (7.4689060931, 75.8330761724), (7.3177825298, 75.8478085303))
            ThreePointArc((7.3177825298, 75.8478085303), (3.6631263964, 76.1119012048), (0, 76.2))
            ThreePointArc((0, 76.2), (-3.6631263964, 76.1119012048), (-7.3177825298, 75.8478085303))
            ThreePointArc((-7.3177825298, 75.8478085303), (-7.4689060931, 75.8330761724), (-7.62, 75.8180427075))
            ThreePointArc((-7.62, 75.8180427075), (-14.8658825376, 74.7358383667), (-21.9743467808, 72.9627856072))
            ThreePointArc((-21.9743467808, 72.9627856072), (-22.1196924068, 72.9188535828), (-22.2649502031, 72.8746320228))
            ThreePointArc((-22.2649502031, 72.8746320228), (-29.1604775462, 70.3996203774), (-35.7864492084, 67.2738437512))
            ThreePointArc((-35.7864492084, 67.2738437512), (-35.9204313461, 67.2024003433), (-36.0542708563, 67.1306900979))
            ThreePointArc((-36.0542708563, 67.1306900979), (-42.3344517561, 63.3579844575), (-48.2232984621, 58.9996058074))
            ThreePointArc((-48.2232984621, 58.9996058074), (-48.3407682533, 58.9033965462), (-48.4580460999, 58.8069534))
            ThreePointArc((-48.4580460999, 58.8069534), (-53.8815367264, 53.8815367264), (-58.8069534, 48.4580460999))
            ThreePointArc((-58.8069534, 48.4580460999), (-58.9033965462, 48.3407682533), (-58.9996058074, 48.2232984621))
            ThreePointArc((-58.9996058074, 48.2232984621), (-63.3579844575, 42.3344517561), (-67.1306900979, 36.0542708563))
            ThreePointArc((-67.1306900979, 36.0542708563), (-67.2024003433, 35.9204313461), (-67.2738437512, 35.7864492084))
            ThreePointArc((-67.2738437512, 35.7864492084), (-70.3996203774, 29.1604775462), (-72.8746320228, 22.2649502031))
            ThreePointArc((-72.8746320228, 22.2649502031), (-72.9188535828, 22.1196924068), (-72.9627856072, 21.9743467808))
            ThreePointArc((-72.9627856072, 21.9743467808), (-74.7358383667, 14.8658825376), (-75.8180427075, 7.62))
            ThreePointArc((-75.8180427075, 7.62), (-75.8330761724, 7.4689060931), (-75.8478085303, 7.3177825298))
            ThreePointArc((-75.8478085303, 7.3177825298), (-76.2, 0), (-75.8478085303, -7.3177825298))
            ThreePointArc((-75.8478085303, -7.3177825298), (-75.8330761724, -7.4689060931), (-75.8180427075, -7.62))
            ThreePointArc((-75.8180427075, -7.62), (-74.7358383667, -14.8658825376), (-72.9627856072, -21.9743467808))
            ThreePointArc((-72.9627856072, -21.9743467808), (-72.9188535828, -22.1196924068), (-72.8746320228, -22.2649502031))
            ThreePointArc((-72.8746320228, -22.2649502031), (-70.3996203774, -29.1604775462), (-67.2738437512, -35.7864492084))
            ThreePointArc((-67.2738437512, -35.7864492084), (-67.2024003433, -35.9204313461), (-67.1306900979, -36.0542708563))
            ThreePointArc((-67.1306900979, -36.0542708563), (-63.3579844575, -42.3344517561), (-58.9996058074, -48.2232984621))
            ThreePointArc((-58.9996058074, -48.2232984621), (-58.9033965462, -48.3407682533), (-58.8069534, -48.4580460999))
            ThreePointArc((-58.8069534, -48.4580460999), (-53.8815367264, -53.8815367264), (-48.4580460999, -58.8069534))
            ThreePointArc((-48.4580460999, -58.8069534), (-48.3407682533, -58.9033965462), (-48.2232984621, -58.9996058074))
            ThreePointArc((-48.2232984621, -58.9996058074), (-42.3344517561, -63.3579844575), (-36.0542708563, -67.1306900979))
            ThreePointArc((-36.0542708563, -67.1306900979), (-35.9204313461, -67.2024003433), (-35.7864492084, -67.2738437512))
            ThreePointArc((-35.7864492084, -67.2738437512), (-29.1604775462, -70.3996203774), (-22.2649502031, -72.8746320228))
            ThreePointArc((-22.2649502031, -72.8746320228), (-22.1196924068, -72.9188535828), (-21.9743467808, -72.9627856072))
            ThreePointArc((-21.9743467808, -72.9627856072), (-14.8658825376, -74.7358383667), (-7.62, -75.8180427075))
            ThreePointArc((-7.62, -75.8180427075), (-7.4689060931, -75.8330761724), (-7.3177825298, -75.8478085303))
            ThreePointArc((-7.3177825298, -75.8478085303), (0, -76.2), (7.3177825298, -75.8478085303))
            ThreePointArc((7.3177825298, -75.8478085303), (7.4689060931, -75.8330761724), (7.62, -75.8180427075))
            ThreePointArc((7.62, -75.8180427075), (14.8658825376, -74.7358383667), (21.9743467808, -72.9627856072))
            ThreePointArc((21.9743467808, -72.9627856072), (22.1196924068, -72.9188535828), (22.2649502031, -72.8746320228))
            ThreePointArc((22.2649502031, -72.8746320228), (29.1604775462, -70.3996203774), (35.7864492084, -67.2738437512))
            ThreePointArc((35.7864492084, -67.2738437512), (35.9204313461, -67.2024003433), (36.0542708563, -67.1306900979))
            ThreePointArc((36.0542708563, -67.1306900979), (42.3344517561, -63.3579844575), (48.2232984621, -58.9996058074))
            ThreePointArc((48.2232984621, -58.9996058074), (48.3407682533, -58.9033965462), (48.4580460999, -58.8069534))
            ThreePointArc((48.4580460999, -58.8069534), (53.8815367264, -53.8815367264), (58.8069534, -48.4580460999))
            ThreePointArc((58.8069534, -48.4580460999), (58.9033965462, -48.3407682533), (58.9996058074, -48.2232984621))
            ThreePointArc((58.9996058074, -48.2232984621), (63.3579844575, -42.3344517561), (67.1306900979, -36.0542708563))
            ThreePointArc((67.1306900979, -36.0542708563), (67.2024003433, -35.9204313461), (67.2738437512, -35.7864492084))
            ThreePointArc((67.2738437512, -35.7864492084), (70.3996203774, -29.1604775462), (72.8746320228, -22.2649502031))
            ThreePointArc((72.8746320228, -22.2649502031), (72.9188535828, -22.1196924068), (72.9627856072, -21.9743467808))
            ThreePointArc((72.9627856072, -21.9743467808), (74.7358383667, -14.8658825376), (75.8180427075, -7.62))
            ThreePointArc((75.8180427075, -7.62), (75.8330761724, -7.4689060931), (75.8478085303, -7.3177825298))
        make_face()
        with BuildLine():
            ThreePointArc((25.4, 0), (-17.9605122421, -17.9605122421), (0, 25.4))
            ThreePointArc((0, 25.4), (17.9605122421, 17.9605122421), (25.4, 0))
        make_face(mode=Mode.SUBTRACT)
    extrude(amount=F2_DEPTH, both=True)

    # F0 (on Front) → F3 (join, symmetric)
    with BuildSketch(Plane.XZ):
        with BuildLine():
            ThreePointArc((75.8478085303, -7.3177825298), (76.1119012048, -3.6631263964), (76.2, 0))
            ThreePointArc((76.2, 0), (76.1119012048, 3.6631263964), (75.8478085303, 7.3177825298))
            ThreePointArc((75.8478085303, 7.3177825298), (75.8330761724, 7.4689060931), (75.8180427075, 7.62))
            ThreePointArc((75.8180427075, 7.62), (74.7358383667, 14.8658825376), (72.9627856072, 21.9743467808))
            ThreePointArc((72.9627856072, 21.9743467808), (72.9188535828, 22.1196924068), (72.8746320228, 22.2649502031))
            ThreePointArc((72.8746320228, 22.2649502031), (70.3996203774, 29.1604775462), (67.2738437512, 35.7864492084))
            ThreePointArc((67.2738437512, 35.7864492084), (67.2024003433, 35.9204313461), (67.1306900979, 36.0542708563))
            ThreePointArc((67.1306900979, 36.0542708563), (63.3579844575, 42.3344517561), (58.9996058074, 48.2232984621))
            ThreePointArc((58.9996058074, 48.2232984621), (58.9033965462, 48.3407682533), (58.8069534, 48.4580460999))
            ThreePointArc((58.8069534, 48.4580460999), (53.8815367264, 53.8815367264), (48.4580460999, 58.8069534))
            ThreePointArc((48.4580460999, 58.8069534), (48.3407682533, 58.9033965462), (48.2232984621, 58.9996058074))
            ThreePointArc((48.2232984621, 58.9996058074), (42.3344517561, 63.3579844575), (36.0542708563, 67.1306900979))
            ThreePointArc((36.0542708563, 67.1306900979), (35.9204313461, 67.2024003433), (35.7864492084, 67.2738437512))
            ThreePointArc((35.7864492084, 67.2738437512), (29.1604775462, 70.3996203774), (22.2649502031, 72.8746320228))
            ThreePointArc((22.2649502031, 72.8746320228), (22.1196924068, 72.9188535828), (21.9743467808, 72.9627856072))
            ThreePointArc((21.9743467808, 72.9627856072), (14.8658825376, 74.7358383667), (7.62, 75.8180427075))
            ThreePointArc((7.62, 75.8180427075), (7.4689060931, 75.8330761724), (7.3177825298, 75.8478085303))
            ThreePointArc((7.3177825298, 75.8478085303), (3.6631263964, 76.1119012048), (0, 76.2))
            ThreePointArc((0, 76.2), (-3.6631263964, 76.1119012048), (-7.3177825298, 75.8478085303))
            ThreePointArc((-7.3177825298, 75.8478085303), (-7.4689060931, 75.8330761724), (-7.62, 75.8180427075))
            ThreePointArc((-7.62, 75.8180427075), (-14.8658825376, 74.7358383667), (-21.9743467808, 72.9627856072))
            ThreePointArc((-21.9743467808, 72.9627856072), (-22.1196924068, 72.9188535828), (-22.2649502031, 72.8746320228))
            ThreePointArc((-22.2649502031, 72.8746320228), (-29.1604775462, 70.3996203774), (-35.7864492084, 67.2738437512))
            ThreePointArc((-35.7864492084, 67.2738437512), (-35.9204313461, 67.2024003433), (-36.0542708563, 67.1306900979))
            ThreePointArc((-36.0542708563, 67.1306900979), (-42.3344517561, 63.3579844575), (-48.2232984621, 58.9996058074))
            ThreePointArc((-48.2232984621, 58.9996058074), (-48.3407682533, 58.9033965462), (-48.4580460999, 58.8069534))
            ThreePointArc((-48.4580460999, 58.8069534), (-53.8815367264, 53.8815367264), (-58.8069534, 48.4580460999))
            ThreePointArc((-58.8069534, 48.4580460999), (-58.9033965462, 48.3407682533), (-58.9996058074, 48.2232984621))
            ThreePointArc((-58.9996058074, 48.2232984621), (-63.3579844575, 42.3344517561), (-67.1306900979, 36.0542708563))
            ThreePointArc((-67.1306900979, 36.0542708563), (-67.2024003433, 35.9204313461), (-67.2738437512, 35.7864492084))
            ThreePointArc((-67.2738437512, 35.7864492084), (-70.3996203774, 29.1604775462), (-72.8746320228, 22.2649502031))
            ThreePointArc((-72.8746320228, 22.2649502031), (-72.9188535828, 22.1196924068), (-72.9627856072, 21.9743467808))
            ThreePointArc((-72.9627856072, 21.9743467808), (-74.7358383667, 14.8658825376), (-75.8180427075, 7.62))
            ThreePointArc((-75.8180427075, 7.62), (-75.8330761724, 7.4689060931), (-75.8478085303, 7.3177825298))
            ThreePointArc((-75.8478085303, 7.3177825298), (-76.2, 0), (-75.8478085303, -7.3177825298))
            ThreePointArc((-75.8478085303, -7.3177825298), (-75.8330761724, -7.4689060931), (-75.8180427075, -7.62))
            ThreePointArc((-75.8180427075, -7.62), (-74.7358383667, -14.8658825376), (-72.9627856072, -21.9743467808))
            ThreePointArc((-72.9627856072, -21.9743467808), (-72.9188535828, -22.1196924068), (-72.8746320228, -22.2649502031))
            ThreePointArc((-72.8746320228, -22.2649502031), (-70.3996203774, -29.1604775462), (-67.2738437512, -35.7864492084))
            ThreePointArc((-67.2738437512, -35.7864492084), (-67.2024003433, -35.9204313461), (-67.1306900979, -36.0542708563))
            ThreePointArc((-67.1306900979, -36.0542708563), (-63.3579844575, -42.3344517561), (-58.9996058074, -48.2232984621))
            ThreePointArc((-58.9996058074, -48.2232984621), (-58.9033965462, -48.3407682533), (-58.8069534, -48.4580460999))
            ThreePointArc((-58.8069534, -48.4580460999), (-53.8815367264, -53.8815367264), (-48.4580460999, -58.8069534))
            ThreePointArc((-48.4580460999, -58.8069534), (-48.3407682533, -58.9033965462), (-48.2232984621, -58.9996058074))
            ThreePointArc((-48.2232984621, -58.9996058074), (-42.3344517561, -63.3579844575), (-36.0542708563, -67.1306900979))
            ThreePointArc((-36.0542708563, -67.1306900979), (-35.9204313461, -67.2024003433), (-35.7864492084, -67.2738437512))
            ThreePointArc((-35.7864492084, -67.2738437512), (-29.1604775462, -70.3996203774), (-22.2649502031, -72.8746320228))
            ThreePointArc((-22.2649502031, -72.8746320228), (-22.1196924068, -72.9188535828), (-21.9743467808, -72.9627856072))
            ThreePointArc((-21.9743467808, -72.9627856072), (-14.8658825376, -74.7358383667), (-7.62, -75.8180427075))
            ThreePointArc((-7.62, -75.8180427075), (-7.4689060931, -75.8330761724), (-7.3177825298, -75.8478085303))
            ThreePointArc((-7.3177825298, -75.8478085303), (0, -76.2), (7.3177825298, -75.8478085303))
            ThreePointArc((7.3177825298, -75.8478085303), (7.4689060931, -75.8330761724), (7.62, -75.8180427075))
            ThreePointArc((7.62, -75.8180427075), (14.8658825376, -74.7358383667), (21.9743467808, -72.9627856072))
            ThreePointArc((21.9743467808, -72.9627856072), (22.1196924068, -72.9188535828), (22.2649502031, -72.8746320228))
            ThreePointArc((22.2649502031, -72.8746320228), (29.1604775462, -70.3996203774), (35.7864492084, -67.2738437512))
            ThreePointArc((35.7864492084, -67.2738437512), (35.9204313461, -67.2024003433), (36.0542708563, -67.1306900979))
            ThreePointArc((36.0542708563, -67.1306900979), (42.3344517561, -63.3579844575), (48.2232984621, -58.9996058074))
            ThreePointArc((48.2232984621, -58.9996058074), (48.3407682533, -58.9033965462), (48.4580460999, -58.8069534))
            ThreePointArc((48.4580460999, -58.8069534), (53.8815367264, -53.8815367264), (58.8069534, -48.4580460999))
            ThreePointArc((58.8069534, -48.4580460999), (58.9033965462, -48.3407682533), (58.9996058074, -48.2232984621))
            ThreePointArc((58.9996058074, -48.2232984621), (63.3579844575, -42.3344517561), (67.1306900979, -36.0542708563))
            ThreePointArc((67.1306900979, -36.0542708563), (67.2024003433, -35.9204313461), (67.2738437512, -35.7864492084))
            ThreePointArc((67.2738437512, -35.7864492084), (70.3996203774, -29.1604775462), (72.8746320228, -22.2649502031))
            ThreePointArc((72.8746320228, -22.2649502031), (72.9188535828, -22.1196924068), (72.9627856072, -21.9743467808))
            ThreePointArc((72.9627856072, -21.9743467808), (74.7358383667, -14.8658825376), (75.8180427075, -7.62))
            ThreePointArc((75.8180427075, -7.62), (75.8330761724, -7.4689060931), (75.8478085303, -7.3177825298))
        make_face()
        with BuildLine():
            ThreePointArc((25.4, 0), (-17.9605122421, -17.9605122421), (0, 25.4))
            ThreePointArc((0, 25.4), (17.9605122421, 17.9605122421), (25.4, 0))
        make_face(mode=Mode.SUBTRACT)
    extrude(amount=F3_DEPTH, both=True)


solid = f1.part
